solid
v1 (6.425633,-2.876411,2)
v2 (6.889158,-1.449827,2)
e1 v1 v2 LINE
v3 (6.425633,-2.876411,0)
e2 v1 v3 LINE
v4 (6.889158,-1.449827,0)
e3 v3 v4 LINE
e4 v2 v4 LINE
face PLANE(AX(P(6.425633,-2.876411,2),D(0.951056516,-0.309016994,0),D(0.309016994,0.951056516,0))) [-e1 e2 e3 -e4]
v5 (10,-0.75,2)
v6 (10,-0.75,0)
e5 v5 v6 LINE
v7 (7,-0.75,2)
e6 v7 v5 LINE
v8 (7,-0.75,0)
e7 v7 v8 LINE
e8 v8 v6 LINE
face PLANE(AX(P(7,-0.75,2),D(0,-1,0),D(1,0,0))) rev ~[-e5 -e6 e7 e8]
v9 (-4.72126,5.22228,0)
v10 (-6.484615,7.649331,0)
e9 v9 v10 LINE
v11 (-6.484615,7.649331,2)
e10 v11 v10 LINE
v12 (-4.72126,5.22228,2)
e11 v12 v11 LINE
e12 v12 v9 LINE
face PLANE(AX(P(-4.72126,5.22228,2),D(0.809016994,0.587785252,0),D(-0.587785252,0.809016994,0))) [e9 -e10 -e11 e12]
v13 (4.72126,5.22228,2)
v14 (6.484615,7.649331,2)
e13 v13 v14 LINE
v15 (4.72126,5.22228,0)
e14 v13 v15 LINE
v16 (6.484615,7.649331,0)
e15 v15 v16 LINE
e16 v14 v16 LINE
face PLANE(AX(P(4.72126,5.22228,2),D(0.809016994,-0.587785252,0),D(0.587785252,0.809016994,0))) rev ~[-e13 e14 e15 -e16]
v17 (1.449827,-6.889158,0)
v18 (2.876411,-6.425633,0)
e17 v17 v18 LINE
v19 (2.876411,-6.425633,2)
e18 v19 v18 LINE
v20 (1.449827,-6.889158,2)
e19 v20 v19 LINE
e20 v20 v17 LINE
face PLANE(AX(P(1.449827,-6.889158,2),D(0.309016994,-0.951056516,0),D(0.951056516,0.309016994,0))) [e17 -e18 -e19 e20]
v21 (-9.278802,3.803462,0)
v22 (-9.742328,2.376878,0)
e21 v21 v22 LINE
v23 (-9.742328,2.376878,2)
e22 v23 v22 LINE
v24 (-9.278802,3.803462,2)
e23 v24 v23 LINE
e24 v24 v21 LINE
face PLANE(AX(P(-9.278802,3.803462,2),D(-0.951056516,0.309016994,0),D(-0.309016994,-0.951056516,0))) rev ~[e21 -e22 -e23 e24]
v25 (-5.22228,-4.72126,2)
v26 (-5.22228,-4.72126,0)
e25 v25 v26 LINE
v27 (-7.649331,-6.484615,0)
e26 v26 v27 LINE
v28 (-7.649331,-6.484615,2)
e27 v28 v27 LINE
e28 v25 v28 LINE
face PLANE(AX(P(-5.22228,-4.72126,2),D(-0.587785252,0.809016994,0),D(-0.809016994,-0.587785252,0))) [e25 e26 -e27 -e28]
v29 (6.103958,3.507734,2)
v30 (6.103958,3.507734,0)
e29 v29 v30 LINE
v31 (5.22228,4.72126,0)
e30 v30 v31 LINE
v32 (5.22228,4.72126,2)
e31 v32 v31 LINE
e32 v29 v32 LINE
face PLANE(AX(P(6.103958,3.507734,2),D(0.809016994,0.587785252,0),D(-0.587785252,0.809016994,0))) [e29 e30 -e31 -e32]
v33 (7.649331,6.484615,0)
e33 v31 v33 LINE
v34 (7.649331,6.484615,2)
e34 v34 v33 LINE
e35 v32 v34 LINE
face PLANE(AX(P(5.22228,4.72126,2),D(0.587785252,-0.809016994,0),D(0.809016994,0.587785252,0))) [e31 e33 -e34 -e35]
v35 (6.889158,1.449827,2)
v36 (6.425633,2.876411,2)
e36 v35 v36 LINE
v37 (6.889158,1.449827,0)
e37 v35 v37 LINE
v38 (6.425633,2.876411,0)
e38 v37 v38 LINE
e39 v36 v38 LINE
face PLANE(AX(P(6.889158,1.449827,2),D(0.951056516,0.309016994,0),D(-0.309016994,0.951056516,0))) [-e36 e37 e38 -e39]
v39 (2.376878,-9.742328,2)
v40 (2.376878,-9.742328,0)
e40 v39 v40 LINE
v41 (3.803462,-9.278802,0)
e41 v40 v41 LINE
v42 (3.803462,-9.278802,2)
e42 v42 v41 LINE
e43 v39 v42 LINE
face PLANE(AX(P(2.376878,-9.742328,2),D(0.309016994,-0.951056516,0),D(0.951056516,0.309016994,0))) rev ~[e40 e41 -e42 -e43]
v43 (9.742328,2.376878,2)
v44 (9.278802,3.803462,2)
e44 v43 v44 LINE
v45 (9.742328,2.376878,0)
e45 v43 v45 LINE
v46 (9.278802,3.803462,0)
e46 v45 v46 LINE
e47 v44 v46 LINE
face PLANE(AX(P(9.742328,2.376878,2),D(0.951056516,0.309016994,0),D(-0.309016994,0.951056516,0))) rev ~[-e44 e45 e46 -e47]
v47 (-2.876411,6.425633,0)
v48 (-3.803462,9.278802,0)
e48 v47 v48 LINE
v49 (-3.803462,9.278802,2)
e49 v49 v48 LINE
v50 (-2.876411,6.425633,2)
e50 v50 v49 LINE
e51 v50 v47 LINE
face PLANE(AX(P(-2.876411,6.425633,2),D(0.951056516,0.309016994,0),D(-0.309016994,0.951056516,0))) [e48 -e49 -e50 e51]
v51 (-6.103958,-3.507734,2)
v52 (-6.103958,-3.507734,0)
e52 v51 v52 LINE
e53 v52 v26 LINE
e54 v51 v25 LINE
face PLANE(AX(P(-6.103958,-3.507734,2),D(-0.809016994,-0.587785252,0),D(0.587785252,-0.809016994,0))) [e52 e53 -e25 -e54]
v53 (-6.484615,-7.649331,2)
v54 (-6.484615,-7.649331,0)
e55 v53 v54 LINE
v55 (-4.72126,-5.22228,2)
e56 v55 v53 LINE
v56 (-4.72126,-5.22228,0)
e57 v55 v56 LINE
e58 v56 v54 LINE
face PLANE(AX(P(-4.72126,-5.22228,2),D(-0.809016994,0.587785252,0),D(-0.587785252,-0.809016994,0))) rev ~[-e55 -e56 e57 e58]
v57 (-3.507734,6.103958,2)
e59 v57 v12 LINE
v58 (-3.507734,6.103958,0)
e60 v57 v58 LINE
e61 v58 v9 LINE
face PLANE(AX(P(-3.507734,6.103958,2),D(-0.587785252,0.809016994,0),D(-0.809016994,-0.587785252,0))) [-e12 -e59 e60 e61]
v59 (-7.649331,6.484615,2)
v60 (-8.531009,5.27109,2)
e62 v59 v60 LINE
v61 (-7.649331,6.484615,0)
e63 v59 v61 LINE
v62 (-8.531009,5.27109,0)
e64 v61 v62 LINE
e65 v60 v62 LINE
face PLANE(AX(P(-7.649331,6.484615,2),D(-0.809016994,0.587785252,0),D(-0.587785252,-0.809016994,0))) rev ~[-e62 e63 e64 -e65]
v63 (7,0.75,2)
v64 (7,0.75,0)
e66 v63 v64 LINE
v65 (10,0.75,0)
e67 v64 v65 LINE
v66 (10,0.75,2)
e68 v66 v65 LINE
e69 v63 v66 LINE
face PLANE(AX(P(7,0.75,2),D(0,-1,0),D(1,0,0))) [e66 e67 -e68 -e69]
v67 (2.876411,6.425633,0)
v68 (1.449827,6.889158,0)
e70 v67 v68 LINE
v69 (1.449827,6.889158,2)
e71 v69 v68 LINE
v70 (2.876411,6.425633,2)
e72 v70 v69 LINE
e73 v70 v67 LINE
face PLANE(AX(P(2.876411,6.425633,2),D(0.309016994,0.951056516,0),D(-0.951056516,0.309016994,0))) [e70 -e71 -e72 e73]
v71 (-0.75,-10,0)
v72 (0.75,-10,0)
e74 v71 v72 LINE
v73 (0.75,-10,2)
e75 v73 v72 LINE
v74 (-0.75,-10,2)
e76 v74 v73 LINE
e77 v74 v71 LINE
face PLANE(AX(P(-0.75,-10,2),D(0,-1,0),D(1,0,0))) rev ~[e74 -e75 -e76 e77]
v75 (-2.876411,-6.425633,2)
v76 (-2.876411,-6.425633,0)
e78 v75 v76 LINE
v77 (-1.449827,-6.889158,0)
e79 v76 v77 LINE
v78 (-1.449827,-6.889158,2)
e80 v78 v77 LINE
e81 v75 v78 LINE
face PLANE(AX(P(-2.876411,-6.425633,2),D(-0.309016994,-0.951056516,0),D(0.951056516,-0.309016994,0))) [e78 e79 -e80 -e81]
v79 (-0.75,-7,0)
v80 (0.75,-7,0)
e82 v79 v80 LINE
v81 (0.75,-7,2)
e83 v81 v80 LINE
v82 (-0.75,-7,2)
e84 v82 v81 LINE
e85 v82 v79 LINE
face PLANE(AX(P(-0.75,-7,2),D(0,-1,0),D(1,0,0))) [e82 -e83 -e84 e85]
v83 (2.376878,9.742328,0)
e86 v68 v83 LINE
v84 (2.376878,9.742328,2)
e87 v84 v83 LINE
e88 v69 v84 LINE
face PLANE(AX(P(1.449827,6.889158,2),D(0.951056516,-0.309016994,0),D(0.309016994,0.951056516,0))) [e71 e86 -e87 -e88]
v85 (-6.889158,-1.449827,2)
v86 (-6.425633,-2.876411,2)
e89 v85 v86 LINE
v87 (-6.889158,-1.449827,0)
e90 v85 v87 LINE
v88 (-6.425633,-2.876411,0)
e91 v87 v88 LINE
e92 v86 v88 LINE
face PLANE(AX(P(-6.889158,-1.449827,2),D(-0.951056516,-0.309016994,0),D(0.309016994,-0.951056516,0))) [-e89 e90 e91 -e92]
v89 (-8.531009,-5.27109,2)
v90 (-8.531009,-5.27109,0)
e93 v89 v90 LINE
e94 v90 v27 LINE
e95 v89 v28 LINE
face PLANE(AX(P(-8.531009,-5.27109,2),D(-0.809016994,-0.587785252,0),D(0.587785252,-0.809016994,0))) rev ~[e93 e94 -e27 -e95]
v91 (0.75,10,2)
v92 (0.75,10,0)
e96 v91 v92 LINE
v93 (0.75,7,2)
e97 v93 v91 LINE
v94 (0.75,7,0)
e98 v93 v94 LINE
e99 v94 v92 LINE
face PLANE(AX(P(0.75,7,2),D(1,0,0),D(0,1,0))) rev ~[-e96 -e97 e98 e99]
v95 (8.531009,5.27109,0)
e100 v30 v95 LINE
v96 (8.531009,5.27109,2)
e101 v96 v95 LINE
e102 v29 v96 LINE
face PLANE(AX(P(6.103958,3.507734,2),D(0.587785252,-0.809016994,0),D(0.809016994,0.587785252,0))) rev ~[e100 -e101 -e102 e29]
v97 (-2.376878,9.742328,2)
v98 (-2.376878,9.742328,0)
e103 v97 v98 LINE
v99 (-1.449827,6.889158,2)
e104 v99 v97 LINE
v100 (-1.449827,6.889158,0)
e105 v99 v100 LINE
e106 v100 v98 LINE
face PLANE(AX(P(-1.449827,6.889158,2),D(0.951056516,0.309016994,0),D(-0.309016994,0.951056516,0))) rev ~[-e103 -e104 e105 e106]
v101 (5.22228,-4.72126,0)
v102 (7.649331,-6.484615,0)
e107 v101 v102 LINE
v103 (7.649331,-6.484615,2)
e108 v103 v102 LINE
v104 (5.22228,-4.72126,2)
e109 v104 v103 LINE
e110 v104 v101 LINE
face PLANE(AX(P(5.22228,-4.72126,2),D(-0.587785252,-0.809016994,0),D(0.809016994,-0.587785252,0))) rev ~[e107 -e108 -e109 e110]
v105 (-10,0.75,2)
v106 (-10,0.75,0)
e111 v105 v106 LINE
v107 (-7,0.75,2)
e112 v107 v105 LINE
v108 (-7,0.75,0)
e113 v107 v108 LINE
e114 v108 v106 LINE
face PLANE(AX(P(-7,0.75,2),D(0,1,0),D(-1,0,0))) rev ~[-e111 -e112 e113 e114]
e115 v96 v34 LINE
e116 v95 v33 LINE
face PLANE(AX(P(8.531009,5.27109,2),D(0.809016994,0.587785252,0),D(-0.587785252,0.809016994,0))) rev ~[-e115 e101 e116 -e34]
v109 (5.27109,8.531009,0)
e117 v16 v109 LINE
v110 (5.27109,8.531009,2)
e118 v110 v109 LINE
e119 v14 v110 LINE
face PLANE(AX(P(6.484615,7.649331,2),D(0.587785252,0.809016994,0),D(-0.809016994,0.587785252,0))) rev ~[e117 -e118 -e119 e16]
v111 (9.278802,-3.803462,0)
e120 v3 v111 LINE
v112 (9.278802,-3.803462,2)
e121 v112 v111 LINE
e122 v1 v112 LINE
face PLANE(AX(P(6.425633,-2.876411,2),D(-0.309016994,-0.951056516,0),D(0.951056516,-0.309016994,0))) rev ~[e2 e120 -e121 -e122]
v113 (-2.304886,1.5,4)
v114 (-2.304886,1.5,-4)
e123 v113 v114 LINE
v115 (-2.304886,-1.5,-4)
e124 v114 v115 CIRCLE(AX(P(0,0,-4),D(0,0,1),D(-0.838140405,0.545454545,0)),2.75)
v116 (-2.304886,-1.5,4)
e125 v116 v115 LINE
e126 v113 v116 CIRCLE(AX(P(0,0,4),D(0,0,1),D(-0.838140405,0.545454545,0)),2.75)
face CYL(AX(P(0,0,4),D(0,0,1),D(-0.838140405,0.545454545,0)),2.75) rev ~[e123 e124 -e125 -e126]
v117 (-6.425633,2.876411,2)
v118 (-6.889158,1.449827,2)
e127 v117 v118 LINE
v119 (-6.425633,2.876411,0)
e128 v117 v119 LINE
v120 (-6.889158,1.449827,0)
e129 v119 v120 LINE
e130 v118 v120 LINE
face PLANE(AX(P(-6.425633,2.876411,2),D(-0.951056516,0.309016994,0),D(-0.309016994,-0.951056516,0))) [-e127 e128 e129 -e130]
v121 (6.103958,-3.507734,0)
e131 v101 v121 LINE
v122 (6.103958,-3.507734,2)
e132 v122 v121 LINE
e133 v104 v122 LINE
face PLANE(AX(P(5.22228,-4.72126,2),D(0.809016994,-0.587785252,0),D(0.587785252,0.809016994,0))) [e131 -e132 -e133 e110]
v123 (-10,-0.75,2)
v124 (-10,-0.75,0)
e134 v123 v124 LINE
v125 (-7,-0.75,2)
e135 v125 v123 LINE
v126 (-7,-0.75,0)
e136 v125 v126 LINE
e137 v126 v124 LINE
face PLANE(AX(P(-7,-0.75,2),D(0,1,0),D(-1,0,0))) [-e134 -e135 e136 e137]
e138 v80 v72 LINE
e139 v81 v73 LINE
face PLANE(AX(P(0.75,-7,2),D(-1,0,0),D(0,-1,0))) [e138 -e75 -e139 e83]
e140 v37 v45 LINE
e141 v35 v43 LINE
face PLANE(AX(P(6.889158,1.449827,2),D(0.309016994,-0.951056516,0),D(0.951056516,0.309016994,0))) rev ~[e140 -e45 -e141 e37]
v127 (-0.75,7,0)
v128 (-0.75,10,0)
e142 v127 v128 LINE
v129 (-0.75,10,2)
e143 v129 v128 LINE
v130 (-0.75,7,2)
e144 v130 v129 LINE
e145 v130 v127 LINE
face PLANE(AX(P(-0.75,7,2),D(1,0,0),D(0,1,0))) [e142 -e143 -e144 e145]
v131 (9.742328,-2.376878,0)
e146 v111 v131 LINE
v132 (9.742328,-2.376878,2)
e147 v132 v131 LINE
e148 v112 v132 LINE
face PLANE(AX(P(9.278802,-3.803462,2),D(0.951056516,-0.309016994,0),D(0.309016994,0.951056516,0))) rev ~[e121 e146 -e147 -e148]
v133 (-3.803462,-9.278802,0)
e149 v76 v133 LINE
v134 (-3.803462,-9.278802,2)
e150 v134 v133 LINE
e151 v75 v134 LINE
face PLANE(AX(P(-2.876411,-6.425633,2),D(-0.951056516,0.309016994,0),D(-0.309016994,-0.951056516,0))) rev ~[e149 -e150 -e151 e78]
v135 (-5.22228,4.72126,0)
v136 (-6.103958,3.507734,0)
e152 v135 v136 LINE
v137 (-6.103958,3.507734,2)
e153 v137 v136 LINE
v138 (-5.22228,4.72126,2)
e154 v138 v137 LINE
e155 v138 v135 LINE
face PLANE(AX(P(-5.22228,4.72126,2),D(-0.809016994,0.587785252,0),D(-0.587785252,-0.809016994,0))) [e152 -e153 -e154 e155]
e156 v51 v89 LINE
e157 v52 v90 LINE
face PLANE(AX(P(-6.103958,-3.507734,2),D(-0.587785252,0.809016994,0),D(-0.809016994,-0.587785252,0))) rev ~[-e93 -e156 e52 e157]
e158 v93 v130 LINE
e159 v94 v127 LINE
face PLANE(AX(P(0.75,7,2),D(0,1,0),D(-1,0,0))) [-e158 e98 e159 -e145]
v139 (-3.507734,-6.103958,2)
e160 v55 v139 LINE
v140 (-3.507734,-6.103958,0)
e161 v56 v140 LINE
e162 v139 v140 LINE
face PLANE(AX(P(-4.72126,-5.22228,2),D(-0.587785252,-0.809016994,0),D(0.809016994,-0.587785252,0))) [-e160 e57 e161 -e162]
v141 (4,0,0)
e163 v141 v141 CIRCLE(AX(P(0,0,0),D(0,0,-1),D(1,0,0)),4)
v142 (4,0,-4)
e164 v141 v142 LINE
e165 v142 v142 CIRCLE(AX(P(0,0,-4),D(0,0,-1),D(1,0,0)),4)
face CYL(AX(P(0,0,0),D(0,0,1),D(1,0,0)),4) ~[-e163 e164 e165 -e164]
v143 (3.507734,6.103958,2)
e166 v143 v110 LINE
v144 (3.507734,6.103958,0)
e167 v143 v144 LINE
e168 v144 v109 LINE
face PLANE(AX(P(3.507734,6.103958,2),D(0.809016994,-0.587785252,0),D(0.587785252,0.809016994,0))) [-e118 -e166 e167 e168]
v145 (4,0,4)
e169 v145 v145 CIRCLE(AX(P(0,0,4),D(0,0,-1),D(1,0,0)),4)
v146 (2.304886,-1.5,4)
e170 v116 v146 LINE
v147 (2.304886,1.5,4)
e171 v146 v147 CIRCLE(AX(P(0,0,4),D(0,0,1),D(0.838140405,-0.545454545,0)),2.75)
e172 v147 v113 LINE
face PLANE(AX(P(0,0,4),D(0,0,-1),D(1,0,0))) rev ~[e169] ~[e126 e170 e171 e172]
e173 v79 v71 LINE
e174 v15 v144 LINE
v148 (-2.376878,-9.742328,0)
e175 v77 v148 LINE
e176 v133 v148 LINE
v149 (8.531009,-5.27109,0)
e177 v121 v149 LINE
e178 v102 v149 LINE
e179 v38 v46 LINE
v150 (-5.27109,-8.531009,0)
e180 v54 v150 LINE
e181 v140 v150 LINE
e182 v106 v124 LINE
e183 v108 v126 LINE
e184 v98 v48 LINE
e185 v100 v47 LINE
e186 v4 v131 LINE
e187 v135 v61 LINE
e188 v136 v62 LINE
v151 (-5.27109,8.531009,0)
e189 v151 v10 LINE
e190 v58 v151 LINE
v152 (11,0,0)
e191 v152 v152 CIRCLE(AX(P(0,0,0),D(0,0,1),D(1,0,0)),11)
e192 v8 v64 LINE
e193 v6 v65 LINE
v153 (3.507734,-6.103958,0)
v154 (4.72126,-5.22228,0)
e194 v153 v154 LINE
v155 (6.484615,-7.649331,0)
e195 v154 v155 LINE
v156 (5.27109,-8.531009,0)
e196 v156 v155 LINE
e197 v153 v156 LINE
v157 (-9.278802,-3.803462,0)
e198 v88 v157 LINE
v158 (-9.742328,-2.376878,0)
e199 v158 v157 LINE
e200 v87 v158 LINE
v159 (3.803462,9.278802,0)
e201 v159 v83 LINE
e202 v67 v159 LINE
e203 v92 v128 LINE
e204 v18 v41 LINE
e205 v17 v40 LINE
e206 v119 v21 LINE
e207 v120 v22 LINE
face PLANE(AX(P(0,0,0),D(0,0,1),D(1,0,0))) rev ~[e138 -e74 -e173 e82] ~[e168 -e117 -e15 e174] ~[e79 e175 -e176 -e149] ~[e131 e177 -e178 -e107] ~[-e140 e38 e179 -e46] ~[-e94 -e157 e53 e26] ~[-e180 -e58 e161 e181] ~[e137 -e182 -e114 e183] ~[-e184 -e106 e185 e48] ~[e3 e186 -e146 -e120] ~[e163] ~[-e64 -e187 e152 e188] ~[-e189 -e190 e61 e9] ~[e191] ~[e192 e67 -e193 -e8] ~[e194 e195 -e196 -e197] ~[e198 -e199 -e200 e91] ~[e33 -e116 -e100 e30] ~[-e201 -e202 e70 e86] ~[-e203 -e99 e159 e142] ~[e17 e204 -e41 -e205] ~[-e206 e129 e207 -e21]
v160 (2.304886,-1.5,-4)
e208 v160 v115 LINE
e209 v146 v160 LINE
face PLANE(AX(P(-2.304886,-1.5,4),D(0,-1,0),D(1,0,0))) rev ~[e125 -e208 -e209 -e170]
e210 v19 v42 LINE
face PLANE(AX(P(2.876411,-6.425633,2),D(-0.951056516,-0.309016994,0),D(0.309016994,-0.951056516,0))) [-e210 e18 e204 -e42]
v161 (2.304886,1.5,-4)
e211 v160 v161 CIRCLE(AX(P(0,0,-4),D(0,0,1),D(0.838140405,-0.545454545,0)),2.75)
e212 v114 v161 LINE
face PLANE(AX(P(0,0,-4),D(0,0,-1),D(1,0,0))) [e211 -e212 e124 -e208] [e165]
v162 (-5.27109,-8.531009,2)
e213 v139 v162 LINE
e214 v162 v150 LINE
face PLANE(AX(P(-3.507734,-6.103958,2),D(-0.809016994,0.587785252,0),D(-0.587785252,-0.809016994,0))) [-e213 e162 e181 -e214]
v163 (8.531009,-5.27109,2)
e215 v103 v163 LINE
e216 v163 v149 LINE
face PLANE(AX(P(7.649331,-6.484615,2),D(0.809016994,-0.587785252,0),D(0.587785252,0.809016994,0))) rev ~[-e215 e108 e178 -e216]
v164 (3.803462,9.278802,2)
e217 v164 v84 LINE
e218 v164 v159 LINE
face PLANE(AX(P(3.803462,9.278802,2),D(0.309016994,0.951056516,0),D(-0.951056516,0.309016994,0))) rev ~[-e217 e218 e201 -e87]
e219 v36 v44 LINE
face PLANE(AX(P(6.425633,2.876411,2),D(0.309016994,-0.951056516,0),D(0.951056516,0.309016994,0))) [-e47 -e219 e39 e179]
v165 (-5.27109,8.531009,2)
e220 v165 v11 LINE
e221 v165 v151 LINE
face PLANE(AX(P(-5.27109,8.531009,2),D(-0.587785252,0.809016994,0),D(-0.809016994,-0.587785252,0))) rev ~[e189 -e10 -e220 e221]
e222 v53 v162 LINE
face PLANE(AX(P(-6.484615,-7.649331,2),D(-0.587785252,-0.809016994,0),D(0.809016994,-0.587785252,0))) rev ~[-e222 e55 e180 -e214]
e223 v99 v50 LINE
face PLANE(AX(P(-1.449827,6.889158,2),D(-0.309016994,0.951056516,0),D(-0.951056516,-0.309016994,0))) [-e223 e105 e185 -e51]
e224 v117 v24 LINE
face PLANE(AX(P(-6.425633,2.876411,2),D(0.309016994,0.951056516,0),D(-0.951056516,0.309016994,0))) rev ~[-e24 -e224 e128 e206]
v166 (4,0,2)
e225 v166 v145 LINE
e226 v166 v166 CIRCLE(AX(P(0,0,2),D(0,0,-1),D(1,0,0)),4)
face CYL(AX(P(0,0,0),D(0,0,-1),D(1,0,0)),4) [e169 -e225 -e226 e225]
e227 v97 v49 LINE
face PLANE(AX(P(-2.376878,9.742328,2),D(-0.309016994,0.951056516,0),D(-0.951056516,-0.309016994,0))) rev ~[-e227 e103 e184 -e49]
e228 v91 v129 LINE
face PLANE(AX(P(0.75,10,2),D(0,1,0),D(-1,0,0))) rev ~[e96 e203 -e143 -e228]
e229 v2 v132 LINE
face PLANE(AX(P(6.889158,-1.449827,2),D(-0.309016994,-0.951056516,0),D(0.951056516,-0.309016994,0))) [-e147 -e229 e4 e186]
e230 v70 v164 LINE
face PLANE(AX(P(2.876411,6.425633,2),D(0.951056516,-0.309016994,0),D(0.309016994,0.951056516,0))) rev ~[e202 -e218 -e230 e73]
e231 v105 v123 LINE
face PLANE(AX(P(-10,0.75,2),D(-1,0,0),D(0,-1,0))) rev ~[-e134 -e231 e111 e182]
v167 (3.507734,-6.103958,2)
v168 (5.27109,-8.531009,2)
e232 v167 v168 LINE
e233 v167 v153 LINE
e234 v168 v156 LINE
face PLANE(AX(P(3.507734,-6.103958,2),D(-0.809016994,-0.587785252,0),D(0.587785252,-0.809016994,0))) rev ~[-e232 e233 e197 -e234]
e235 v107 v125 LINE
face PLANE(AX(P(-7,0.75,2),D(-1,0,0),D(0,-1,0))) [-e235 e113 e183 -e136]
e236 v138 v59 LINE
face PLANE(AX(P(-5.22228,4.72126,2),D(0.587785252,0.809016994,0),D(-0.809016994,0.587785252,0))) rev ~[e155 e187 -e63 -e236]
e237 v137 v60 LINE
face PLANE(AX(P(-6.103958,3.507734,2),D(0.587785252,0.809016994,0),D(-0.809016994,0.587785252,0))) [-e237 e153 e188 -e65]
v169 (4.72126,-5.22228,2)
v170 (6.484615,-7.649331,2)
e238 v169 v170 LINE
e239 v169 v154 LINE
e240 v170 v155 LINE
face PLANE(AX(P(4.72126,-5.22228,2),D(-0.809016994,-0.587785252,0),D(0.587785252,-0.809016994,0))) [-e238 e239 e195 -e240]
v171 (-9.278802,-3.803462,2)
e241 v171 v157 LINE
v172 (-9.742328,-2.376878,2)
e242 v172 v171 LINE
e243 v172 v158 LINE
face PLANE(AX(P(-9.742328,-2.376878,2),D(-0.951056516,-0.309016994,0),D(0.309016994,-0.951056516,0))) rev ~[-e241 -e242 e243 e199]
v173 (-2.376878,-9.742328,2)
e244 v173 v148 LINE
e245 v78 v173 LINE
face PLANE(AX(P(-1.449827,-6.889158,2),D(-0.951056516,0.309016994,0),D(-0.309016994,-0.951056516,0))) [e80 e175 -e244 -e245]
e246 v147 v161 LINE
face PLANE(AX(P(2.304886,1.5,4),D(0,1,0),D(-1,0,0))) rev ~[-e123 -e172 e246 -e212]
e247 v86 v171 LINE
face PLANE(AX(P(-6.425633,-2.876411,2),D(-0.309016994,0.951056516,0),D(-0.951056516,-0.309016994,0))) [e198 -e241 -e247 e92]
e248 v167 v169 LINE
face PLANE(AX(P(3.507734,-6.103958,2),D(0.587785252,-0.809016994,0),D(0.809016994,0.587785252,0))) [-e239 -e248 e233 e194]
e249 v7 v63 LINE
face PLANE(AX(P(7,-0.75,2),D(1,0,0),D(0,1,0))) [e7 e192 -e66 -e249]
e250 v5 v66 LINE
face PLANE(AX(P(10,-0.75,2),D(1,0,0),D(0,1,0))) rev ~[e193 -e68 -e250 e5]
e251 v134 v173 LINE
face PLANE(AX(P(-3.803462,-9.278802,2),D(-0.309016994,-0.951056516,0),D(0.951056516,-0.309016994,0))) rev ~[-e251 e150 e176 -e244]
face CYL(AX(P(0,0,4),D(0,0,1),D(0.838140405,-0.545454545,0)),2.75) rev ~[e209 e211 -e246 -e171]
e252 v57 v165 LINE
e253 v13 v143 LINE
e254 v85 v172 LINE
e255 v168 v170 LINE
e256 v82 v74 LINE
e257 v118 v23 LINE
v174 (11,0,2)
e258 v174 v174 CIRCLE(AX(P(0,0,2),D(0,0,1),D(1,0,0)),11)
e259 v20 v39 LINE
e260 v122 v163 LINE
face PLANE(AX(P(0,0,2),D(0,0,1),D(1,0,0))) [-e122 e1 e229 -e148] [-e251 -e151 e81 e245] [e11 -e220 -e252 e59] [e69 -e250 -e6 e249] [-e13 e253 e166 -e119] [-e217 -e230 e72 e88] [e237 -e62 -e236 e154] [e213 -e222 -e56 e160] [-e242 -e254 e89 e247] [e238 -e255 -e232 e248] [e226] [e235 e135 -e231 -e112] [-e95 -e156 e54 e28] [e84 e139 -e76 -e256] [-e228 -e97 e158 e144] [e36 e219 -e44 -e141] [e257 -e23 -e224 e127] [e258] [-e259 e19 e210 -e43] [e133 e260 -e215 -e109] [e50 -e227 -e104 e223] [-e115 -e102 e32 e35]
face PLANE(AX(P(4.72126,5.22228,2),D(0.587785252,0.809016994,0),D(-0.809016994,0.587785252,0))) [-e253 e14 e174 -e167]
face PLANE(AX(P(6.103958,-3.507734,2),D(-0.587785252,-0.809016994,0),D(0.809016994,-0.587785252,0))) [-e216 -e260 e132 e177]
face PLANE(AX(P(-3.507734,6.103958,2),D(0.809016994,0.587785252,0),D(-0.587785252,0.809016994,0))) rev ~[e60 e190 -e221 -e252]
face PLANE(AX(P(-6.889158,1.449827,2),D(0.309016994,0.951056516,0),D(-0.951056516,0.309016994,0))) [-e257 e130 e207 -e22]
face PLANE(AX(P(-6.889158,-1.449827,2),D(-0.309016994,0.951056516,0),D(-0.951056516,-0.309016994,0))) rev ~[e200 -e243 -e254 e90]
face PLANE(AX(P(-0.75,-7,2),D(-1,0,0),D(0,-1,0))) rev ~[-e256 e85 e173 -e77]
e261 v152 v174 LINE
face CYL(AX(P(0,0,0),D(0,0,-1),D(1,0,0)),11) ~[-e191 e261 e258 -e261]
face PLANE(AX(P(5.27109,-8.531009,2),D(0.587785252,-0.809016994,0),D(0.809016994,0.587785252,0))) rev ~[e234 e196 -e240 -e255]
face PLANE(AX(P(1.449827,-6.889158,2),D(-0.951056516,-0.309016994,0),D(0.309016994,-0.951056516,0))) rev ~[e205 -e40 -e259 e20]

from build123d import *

# Parameters (mm, degrees)
F0_R            = 11
F1_DEPTH        = 2
F2_W            = 3
F2_H            = 1.5
F3_DEPTH        = 2
F3_COPIES_COUNT = 20
F4_R            = 4
F5_DEPTH        = 4
F5_DEPTH_BACK   = 4
F7_DEPTH        = 9


# Not quite as in the source:
# - a pattern or mirror of a feature is missing from the dataset's text; its kind, count and spacing are read off the source's solid


with BuildPart() as f1:
    # F0 (on Top) → F1 (new body)
    with BuildSketch(Plane.XY):
        Circle(F0_R)
    extrude(amount=F1_DEPTH)

    # F2 (on face) → F3 (cut)
    with BuildSketch(Plane.XY.offset(2)):
        with Locations((8.5, 0)):
            Rectangle(F2_W, F2_H)
    f3 = extrude(amount=-F3_DEPTH, mode=Mode.SUBTRACT)

    # F3_copies: F3 ×20 about axis
    f3_copies_axis = Axis((0, 0, 0), (0, 0, 1))
    for i in range(1, F3_COPIES_COUNT):
        add(f3.rotate(f3_copies_axis, i * 360 / F3_COPIES_COUNT), mode=Mode.SUBTRACT)

    # F4 (on face) → F5 (join, two sides)
    with BuildSketch(Plane(origin=(0, 0, 0), x_dir=(1, 0, 0), z_dir=(0, 0, -1))) as f5_sk:
        Circle(F4_R)
    extrude(amount=F5_DEPTH)
    extrude(f5_sk.sketch, amount=-F5_DEPTH_BACK)

    # F6 (on face) → F7 (cut)
    with BuildSketch(Plane.XY.offset(4)):
        with BuildLine():
            Line((-2.3048861143, -1.5), (2.3048861143, -1.5))
            ThreePointArc((2.3048861143, -1.5), (2.75, 0), (2.3048861143, 1.5))
            Line((2.3048861143, 1.5), (-2.3048861143, 1.5))
            ThreePointArc((-2.3048861143, 1.5), (-2.75, 0), (-2.3048861143, -1.5))
        make_face()
    extrude(amount=-F7_DEPTH, mode=Mode.SUBTRACT)


solid = f1.part
